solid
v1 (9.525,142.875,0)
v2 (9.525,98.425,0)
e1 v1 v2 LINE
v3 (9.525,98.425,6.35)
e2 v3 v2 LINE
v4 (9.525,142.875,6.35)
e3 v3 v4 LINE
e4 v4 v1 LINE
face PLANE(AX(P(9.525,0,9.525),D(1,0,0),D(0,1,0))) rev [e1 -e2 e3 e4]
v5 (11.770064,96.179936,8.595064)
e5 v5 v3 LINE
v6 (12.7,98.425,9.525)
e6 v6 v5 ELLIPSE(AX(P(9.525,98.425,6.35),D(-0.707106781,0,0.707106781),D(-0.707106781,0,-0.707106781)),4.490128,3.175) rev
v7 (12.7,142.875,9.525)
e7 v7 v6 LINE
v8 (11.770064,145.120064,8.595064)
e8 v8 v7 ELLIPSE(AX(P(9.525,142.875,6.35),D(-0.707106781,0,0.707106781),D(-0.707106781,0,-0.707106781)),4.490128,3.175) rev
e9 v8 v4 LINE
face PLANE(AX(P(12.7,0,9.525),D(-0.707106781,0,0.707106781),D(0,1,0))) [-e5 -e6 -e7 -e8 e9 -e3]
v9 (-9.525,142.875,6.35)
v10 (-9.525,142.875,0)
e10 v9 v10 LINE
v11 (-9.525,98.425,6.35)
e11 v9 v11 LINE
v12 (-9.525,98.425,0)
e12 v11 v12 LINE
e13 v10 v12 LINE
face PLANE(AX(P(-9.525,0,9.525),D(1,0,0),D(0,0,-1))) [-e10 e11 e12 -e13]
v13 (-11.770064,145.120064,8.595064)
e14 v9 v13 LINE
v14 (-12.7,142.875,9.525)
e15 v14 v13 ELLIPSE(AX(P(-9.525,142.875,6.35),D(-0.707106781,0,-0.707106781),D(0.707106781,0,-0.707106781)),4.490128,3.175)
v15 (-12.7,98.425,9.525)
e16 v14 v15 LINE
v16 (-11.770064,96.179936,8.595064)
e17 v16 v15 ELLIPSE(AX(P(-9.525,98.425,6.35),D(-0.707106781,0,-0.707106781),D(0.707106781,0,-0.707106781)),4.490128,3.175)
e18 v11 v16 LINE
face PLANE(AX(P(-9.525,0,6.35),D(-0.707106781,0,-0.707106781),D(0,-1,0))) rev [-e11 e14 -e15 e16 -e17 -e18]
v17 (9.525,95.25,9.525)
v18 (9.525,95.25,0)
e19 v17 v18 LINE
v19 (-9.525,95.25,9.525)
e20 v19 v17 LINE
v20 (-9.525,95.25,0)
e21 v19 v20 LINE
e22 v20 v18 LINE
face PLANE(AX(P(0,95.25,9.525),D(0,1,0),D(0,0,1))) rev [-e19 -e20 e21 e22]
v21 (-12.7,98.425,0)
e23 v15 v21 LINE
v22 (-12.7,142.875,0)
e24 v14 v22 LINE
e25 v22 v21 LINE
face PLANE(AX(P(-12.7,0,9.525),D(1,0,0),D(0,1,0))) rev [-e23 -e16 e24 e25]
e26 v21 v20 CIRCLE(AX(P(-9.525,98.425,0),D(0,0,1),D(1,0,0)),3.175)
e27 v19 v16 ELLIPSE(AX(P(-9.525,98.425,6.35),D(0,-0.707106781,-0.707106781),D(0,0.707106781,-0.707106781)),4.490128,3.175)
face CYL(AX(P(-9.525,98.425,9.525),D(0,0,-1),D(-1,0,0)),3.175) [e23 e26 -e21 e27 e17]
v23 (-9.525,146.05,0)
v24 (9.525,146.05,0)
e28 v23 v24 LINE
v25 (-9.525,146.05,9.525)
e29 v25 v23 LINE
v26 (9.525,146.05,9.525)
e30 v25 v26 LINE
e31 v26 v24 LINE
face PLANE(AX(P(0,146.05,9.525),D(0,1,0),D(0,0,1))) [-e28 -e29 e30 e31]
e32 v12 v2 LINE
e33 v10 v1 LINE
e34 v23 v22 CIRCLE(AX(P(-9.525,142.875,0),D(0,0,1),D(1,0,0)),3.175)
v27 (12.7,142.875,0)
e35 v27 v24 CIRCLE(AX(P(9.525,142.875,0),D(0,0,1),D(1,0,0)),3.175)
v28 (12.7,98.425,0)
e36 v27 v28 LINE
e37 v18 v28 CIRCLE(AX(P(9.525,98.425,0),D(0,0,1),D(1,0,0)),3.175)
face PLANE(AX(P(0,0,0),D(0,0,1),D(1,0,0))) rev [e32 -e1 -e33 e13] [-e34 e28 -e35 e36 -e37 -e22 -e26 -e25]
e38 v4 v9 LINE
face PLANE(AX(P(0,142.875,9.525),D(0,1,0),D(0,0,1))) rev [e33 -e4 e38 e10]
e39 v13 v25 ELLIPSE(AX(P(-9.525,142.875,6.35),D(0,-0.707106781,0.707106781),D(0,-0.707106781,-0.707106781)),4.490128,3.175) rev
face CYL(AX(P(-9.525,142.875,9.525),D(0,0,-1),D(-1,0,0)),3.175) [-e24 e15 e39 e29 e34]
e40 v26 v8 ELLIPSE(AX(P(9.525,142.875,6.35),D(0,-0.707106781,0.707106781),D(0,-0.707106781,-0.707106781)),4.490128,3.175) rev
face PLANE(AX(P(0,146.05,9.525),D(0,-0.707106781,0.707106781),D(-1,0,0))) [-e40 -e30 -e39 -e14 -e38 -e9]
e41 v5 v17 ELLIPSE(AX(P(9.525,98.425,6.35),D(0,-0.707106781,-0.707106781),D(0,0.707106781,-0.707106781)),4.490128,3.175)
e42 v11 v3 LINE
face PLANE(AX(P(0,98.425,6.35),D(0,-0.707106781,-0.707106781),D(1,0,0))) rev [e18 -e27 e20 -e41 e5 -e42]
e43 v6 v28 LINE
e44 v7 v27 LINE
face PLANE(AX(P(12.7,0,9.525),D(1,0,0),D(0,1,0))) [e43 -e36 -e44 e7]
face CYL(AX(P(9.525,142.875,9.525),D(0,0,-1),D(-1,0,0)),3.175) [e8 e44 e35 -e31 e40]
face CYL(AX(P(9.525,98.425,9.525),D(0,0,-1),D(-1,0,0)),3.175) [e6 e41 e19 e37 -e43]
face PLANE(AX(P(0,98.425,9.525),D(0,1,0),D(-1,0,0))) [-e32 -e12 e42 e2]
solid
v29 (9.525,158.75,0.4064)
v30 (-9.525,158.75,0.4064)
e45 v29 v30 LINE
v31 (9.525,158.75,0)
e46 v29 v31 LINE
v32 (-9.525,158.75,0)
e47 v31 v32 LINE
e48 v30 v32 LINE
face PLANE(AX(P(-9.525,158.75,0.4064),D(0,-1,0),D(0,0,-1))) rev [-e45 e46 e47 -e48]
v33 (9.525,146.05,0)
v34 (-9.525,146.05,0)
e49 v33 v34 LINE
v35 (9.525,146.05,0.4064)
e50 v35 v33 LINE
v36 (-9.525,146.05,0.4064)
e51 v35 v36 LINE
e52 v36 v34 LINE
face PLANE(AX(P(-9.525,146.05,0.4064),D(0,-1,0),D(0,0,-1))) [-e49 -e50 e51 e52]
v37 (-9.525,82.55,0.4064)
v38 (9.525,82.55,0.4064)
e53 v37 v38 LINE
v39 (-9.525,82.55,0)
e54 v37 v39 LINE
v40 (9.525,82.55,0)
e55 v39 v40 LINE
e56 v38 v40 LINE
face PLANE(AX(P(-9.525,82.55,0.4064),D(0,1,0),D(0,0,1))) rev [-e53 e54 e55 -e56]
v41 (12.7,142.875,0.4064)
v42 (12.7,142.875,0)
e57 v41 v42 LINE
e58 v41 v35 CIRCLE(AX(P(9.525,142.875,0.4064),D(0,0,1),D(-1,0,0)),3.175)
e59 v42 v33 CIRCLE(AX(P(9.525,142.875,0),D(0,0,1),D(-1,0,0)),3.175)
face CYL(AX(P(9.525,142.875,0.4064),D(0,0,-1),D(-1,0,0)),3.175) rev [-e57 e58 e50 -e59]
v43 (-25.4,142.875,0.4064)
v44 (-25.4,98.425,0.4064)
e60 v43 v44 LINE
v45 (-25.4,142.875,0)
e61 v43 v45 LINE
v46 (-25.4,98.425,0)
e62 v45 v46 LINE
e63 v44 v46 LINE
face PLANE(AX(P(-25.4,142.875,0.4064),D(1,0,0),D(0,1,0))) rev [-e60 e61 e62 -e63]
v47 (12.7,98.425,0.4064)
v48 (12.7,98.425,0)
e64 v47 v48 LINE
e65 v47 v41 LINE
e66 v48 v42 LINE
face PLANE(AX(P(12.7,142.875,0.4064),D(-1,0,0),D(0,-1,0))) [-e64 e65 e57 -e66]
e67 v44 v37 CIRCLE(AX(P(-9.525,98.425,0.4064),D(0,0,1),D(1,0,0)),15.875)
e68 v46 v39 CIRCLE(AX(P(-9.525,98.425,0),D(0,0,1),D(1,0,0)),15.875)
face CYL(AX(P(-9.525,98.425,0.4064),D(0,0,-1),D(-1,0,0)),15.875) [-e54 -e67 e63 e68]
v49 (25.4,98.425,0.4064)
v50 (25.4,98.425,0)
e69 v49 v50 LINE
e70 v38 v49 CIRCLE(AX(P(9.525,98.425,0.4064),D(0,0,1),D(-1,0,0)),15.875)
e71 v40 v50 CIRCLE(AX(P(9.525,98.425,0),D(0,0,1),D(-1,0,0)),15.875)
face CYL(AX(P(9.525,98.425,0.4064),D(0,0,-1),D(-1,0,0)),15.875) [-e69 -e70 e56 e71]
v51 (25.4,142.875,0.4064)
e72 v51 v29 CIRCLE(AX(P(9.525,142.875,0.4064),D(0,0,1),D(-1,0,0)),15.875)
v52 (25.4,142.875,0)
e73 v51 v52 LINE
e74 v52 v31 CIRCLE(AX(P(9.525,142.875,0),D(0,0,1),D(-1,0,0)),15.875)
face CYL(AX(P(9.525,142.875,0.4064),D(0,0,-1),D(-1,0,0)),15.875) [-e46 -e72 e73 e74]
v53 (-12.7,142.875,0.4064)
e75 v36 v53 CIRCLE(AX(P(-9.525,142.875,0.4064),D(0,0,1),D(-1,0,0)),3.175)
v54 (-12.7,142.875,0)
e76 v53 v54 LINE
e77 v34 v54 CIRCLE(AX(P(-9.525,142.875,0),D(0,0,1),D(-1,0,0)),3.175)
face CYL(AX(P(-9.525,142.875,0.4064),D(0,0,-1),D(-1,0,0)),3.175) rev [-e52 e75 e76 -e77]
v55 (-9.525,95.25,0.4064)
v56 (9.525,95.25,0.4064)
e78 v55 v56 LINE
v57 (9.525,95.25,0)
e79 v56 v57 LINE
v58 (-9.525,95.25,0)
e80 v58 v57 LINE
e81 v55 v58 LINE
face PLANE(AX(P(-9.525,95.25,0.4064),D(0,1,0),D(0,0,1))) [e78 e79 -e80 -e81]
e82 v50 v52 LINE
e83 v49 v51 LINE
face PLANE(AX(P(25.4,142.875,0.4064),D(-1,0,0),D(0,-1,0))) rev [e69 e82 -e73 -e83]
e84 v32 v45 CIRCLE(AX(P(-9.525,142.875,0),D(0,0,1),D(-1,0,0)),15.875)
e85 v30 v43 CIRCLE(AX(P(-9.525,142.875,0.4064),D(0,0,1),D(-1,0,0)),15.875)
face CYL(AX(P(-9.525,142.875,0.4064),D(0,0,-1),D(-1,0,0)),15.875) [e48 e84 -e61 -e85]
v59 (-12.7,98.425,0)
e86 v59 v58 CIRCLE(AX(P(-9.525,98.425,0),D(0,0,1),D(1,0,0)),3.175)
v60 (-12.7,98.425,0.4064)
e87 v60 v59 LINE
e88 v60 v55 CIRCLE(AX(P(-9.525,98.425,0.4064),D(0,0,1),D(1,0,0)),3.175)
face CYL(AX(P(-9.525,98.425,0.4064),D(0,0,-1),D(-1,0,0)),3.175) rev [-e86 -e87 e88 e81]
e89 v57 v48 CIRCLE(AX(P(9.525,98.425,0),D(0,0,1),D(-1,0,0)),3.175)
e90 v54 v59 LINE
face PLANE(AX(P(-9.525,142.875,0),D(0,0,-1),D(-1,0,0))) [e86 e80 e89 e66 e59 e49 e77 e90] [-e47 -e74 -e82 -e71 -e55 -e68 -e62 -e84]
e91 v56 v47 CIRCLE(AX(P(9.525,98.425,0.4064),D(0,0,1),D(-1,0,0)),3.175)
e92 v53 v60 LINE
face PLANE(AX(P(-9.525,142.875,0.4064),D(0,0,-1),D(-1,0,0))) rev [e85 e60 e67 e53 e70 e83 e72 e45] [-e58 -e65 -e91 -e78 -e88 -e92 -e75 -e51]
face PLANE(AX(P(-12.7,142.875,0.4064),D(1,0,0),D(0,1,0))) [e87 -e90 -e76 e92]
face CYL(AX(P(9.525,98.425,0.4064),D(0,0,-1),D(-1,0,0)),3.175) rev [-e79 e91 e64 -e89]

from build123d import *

# Parameters (mm, degrees)
BOSS_EXTRUDE1_DEPTH = 0.4064
SKETCH3_W           = 19.05
SKETCH3_H           = 44.45
BOSS_EXTRUDE5_DEPTH = 9.525


with BuildPart() as part:
    # Sketch2 → Boss-Extrude1 (new body)
    with BuildSketch(Plane.XY):
        with BuildLine():
            Line((-9.525, 158.75), (9.525, 158.75))
            ThreePointArc((9.525, 158.75), (20.750320151, 154.100320151), (25.4, 142.875))
            Line((25.4, 142.875), (25.4, 98.425))
            ThreePointArc((25.4, 98.425), (20.750320151, 87.199679849), (9.525, 82.55))
            Line((9.525, 82.55), (-9.525, 82.55))
            ThreePointArc((-9.525, 82.55), (-20.750320151, 87.199679849), (-25.4, 98.425))
            Line((-25.4, 98.425), (-25.4, 142.875))
            ThreePointArc((-25.4, 142.875), (-20.750320151, 154.100320151), (-9.525, 158.75))
        make_face()
        with BuildLine():
            Line((-9.525, 95.25), (9.525, 95.25))
            ThreePointArc((9.525, 95.25), (11.77006403, 96.17993597), (12.7, 98.425))
            Line((12.7, 98.425), (12.7, 142.875))
            ThreePointArc((12.7, 142.875), (11.77006403, 145.12006403), (9.525, 146.05))
            Line((9.525, 146.05), (-9.525, 146.05))
            ThreePointArc((-9.525, 146.05), (-11.77006403, 145.12006403), (-12.7, 142.875))
            Line((-12.7, 142.875), (-12.7, 98.425))
            ThreePointArc((-12.7, 98.425), (-11.77006403, 96.17993597), (-9.525, 95.25))
        make_face(mode=Mode.SUBTRACT)
    extrude(amount=BOSS_EXTRUDE1_DEPTH)


with BuildPart() as body_2:
    # Sketch3 → Boss-Extrude5 (new body)
    with BuildSketch(Plane.XY):
        with BuildLine():
            Line((-9.525, 95.25), (9.525, 95.25))
            ThreePointArc((9.525, 95.25), (11.77006403, 96.17993597), (12.7, 98.425))
            Line((12.7, 98.425), (12.7, 142.875))
            ThreePointArc((12.7, 142.875), (11.77006403, 145.12006403), (9.525, 146.05))
            Line((9.525, 146.05), (-9.525, 146.05))
            ThreePointArc((-9.525, 146.05), (-11.77006403, 145.12006403), (-12.7, 142.875))
            Line((-12.7, 142.875), (-12.7, 98.425))
            ThreePointArc((-12.7, 98.425), (-11.77006403, 96.17993597), (-9.525, 95.25))
        make_face()
        with Locations((0, 120.65)):
            Rectangle(SKETCH3_W, SKETCH3_H, mode=Mode.SUBTRACT)
    extrude(amount=BOSS_EXTRUDE5_DEPTH)

    # Chamfer2
    # the kernel refuses this chamfer: 3.175 mm, written as the material it takes off along each edge
    with BuildSketch(Plane(origin=(9.525, 142.875, 9.525), x_dir=(0, -0.02749587661058566, -0.9996219169112968), z_dir=(-1, 0, 0)), Plane(origin=(-9.525, 98.425, 9.525), x_dir=(0, 0.027495876610585654, -0.9996219169112968), z_dir=(1, 0, 0))) as chamfer2_piece_1:
        with BuildLine():
            Line((3.266037395, 0), (-0.179537217, -3.261098994))
            Line((-0.179537217, -3.261098994), (-0.243013208, -3.259353006))
            ThreePointArc((-0.243013208, -3.259353006), (-0.108360296, -1.630038109), (-0.063475992, 0.001745988))
            Line((-0.063475992, 0.001745988), (0.001745988, 0.063475992))
            ThreePointArc((0.001745988, 0.063475992), (1.633530085, 0.018591688), (3.267783383, 0.063475992))
            Line((3.267783383, 0.063475992), (3.266037395, 0))
        make_face()
    extrude(amount=19.05, mode=Mode.SUBTRACT)
    with BuildSketch(Plane(origin=(9.525, 98.425, 9.525), x_dir=(-0.027495876610586195, 0, -0.9996219169112966), z_dir=(0, 1, 0)), Plane(origin=(-9.525, 142.875, 9.525), x_dir=(0.027495876610586195, 0, -0.9996219169112966), z_dir=(0, -1, 0))) as chamfer2_piece_2:
        with BuildLine():
            Line((3.266037395, 0), (-0.179537217, -3.261098994))
            Line((-0.179537217, -3.261098994), (-0.243013208, -3.259353006))
            ThreePointArc((-0.243013208, -3.259353006), (-0.108360296, -1.630038109), (-0.063475992, 0.001745988))
            Line((-0.063475992, 0.001745988), (0.001745988, 0.063475992))
            ThreePointArc((0.001745988, 0.063475992), (1.633530085, 0.018591688), (3.267783383, 0.063475992))
            Line((3.267783383, 0.063475992), (3.266037395, 0))
        make_face()
    extrude(amount=44.45, mode=Mode.SUBTRACT)
    with BuildSketch(Plane(origin=(17.690093487, 142.875, 9.525), x_dir=(0, -0.02749587661058566, -0.9996219169112968), z_dir=(-1, 0, 0))) as chamfer2_piece_3a_section:
        with BuildLine():
            Line((3.266037395, 0), (-0.179537217, -3.261098994))
            Line((-0.179537217, -3.261098994), (-0.243013208, -3.259353006))
            ThreePointArc((-0.243013208, -3.259353006), (-0.108360296, -1.630038109), (-0.063475992, 0.001745988))
            Line((-0.063475992, 0.001745988), (0.001745988, 0.063475992))
            ThreePointArc((0.001745988, 0.063475992), (1.633530085, 0.018591688), (3.267783383, 0.063475992))
            Line((3.267783383, 0.063475992), (3.266037395, 0))
        make_face()
    chamfer2_piece_3a = extrude(amount=27.215093487, mode=Mode.PRIVATE)
    chamfer2_piece_3a = split(chamfer2_piece_3a, bisect_by=Plane(origin=(9.525, 143.922094765, 8.477905235), z_dir=(1, 0, 0)), keep=Keep.TOP, mode=Mode.PRIVATE)
    with BuildSketch(Plane(origin=(9.525, 98.425, 9.525), x_dir=(-0.027495876610586195, 0, -0.9996219169112966), z_dir=(0, 1, 0))) as chamfer2_piece_3b_section:
        with BuildLine():
            Line((3.266037395, 0), (-0.179537217, -3.261098994))
            Line((-0.179537217, -3.261098994), (-0.243013208, -3.259353006))
            ThreePointArc((-0.243013208, -3.259353006), (-0.108360296, -1.630038109), (-0.063475992, 0.001745988))
            Line((-0.063475992, 0.001745988), (0.001745988, 0.063475992))
            ThreePointArc((0.001745988, 0.063475992), (1.633530085, 0.018591688), (3.267783383, 0.063475992))
            Line((3.267783383, 0.063475992), (3.266037395, 0))
        make_face()
    chamfer2_piece_3b = extrude(amount=52.615093487, mode=Mode.PRIVATE)
    chamfer2_piece_3b = split(chamfer2_piece_3b, bisect_by=Plane(origin=(10.572094765, 142.875, 8.477905235), z_dir=(0, 1, 0)), keep=Keep.TOP, mode=Mode.PRIVATE)
    chamfer2_piece_3 = chamfer2_piece_3a & chamfer2_piece_3b
    add(chamfer2_piece_3, mode=Mode.SUBTRACT)
    with BuildSketch(Plane(origin=(9.525, 142.875, 9.525), x_dir=(0, -0.02749587661058566, -0.9996219169112968), z_dir=(-1, 0, 0))) as chamfer2_piece_4a_section:
        with BuildLine():
            Line((3.266037395, 0), (-0.179537217, -3.261098994))
            Line((-0.179537217, -3.261098994), (-0.243013208, -3.259353006))
            ThreePointArc((-0.243013208, -3.259353006), (-0.108360296, -1.630038109), (-0.063475992, 0.001745988))
            Line((-0.063475992, 0.001745988), (0.001745988, 0.063475992))
            ThreePointArc((0.001745988, 0.063475992), (1.633530085, 0.018591688), (3.267783383, 0.063475992))
            Line((3.267783383, 0.063475992), (3.266037395, 0))
        make_face()
    chamfer2_piece_4a = extrude(amount=27.215093487, mode=Mode.PRIVATE)
    chamfer2_piece_4a = split(chamfer2_piece_4a, bisect_by=Plane(origin=(-9.525, 143.922094765, 8.477905235), z_dir=(-1, 0, 0)), keep=Keep.TOP, mode=Mode.PRIVATE)
    with BuildSketch(Plane(origin=(-9.525, 151.040093487, 9.525), x_dir=(0.027495876610586195, 0, -0.9996219169112966), z_dir=(0, -1, 0))) as chamfer2_piece_4b_section:
        with BuildLine():
            Line((3.266037395, 0), (-0.179537217, -3.261098994))
            Line((-0.179537217, -3.261098994), (-0.243013208, -3.259353006))
            ThreePointArc((-0.243013208, -3.259353006), (-0.108360296, -1.630038109), (-0.063475992, 0.001745988))
            Line((-0.063475992, 0.001745988), (0.001745988, 0.063475992))
            ThreePointArc((0.001745988, 0.063475992), (1.633530085, 0.018591688), (3.267783383, 0.063475992))
            Line((3.267783383, 0.063475992), (3.266037395, 0))
        make_face()
    chamfer2_piece_4b = extrude(amount=52.615093487, mode=Mode.PRIVATE)
    chamfer2_piece_4b = split(chamfer2_piece_4b, bisect_by=Plane(origin=(-10.572094765, 142.875, 8.477905235), z_dir=(0, 1, 0)), keep=Keep.TOP, mode=Mode.PRIVATE)
    chamfer2_piece_4 = chamfer2_piece_4a & chamfer2_piece_4b
    add(chamfer2_piece_4, mode=Mode.SUBTRACT)
    with BuildSketch(Plane(origin=(9.525, 90.259906513, 9.525), x_dir=(-0.027495876610586195, 0, -0.9996219169112966), z_dir=(0, 1, 0))) as chamfer2_piece_5a_section:
        with BuildLine():
            Line((3.266037395, 0), (-0.179537217, -3.261098994))
            Line((-0.179537217, -3.261098994), (-0.243013208, -3.259353006))
            ThreePointArc((-0.243013208, -3.259353006), (-0.108360296, -1.630038109), (-0.063475992, 0.001745988))
            Line((-0.063475992, 0.001745988), (0.001745988, 0.063475992))
            ThreePointArc((0.001745988, 0.063475992), (1.633530085, 0.018591688), (3.267783383, 0.063475992))
            Line((3.267783383, 0.063475992), (3.266037395, 0))
        make_face()
    chamfer2_piece_5a = extrude(amount=52.615093487, mode=Mode.PRIVATE)
    chamfer2_piece_5a = split(chamfer2_piece_5a, bisect_by=Plane(origin=(10.572094765, 98.425, 8.477905235), z_dir=(0, -1, 0)), keep=Keep.TOP, mode=Mode.PRIVATE)
    with BuildSketch(Plane(origin=(-9.525, 98.425, 9.525), x_dir=(0, 0.027495876610585654, -0.9996219169112968), z_dir=(1, 0, 0))) as chamfer2_piece_5b_section:
        with BuildLine():
            Line((3.266037395, 0), (-0.179537217, -3.261098994))
            Line((-0.179537217, -3.261098994), (-0.243013208, -3.259353006))
            ThreePointArc((-0.243013208, -3.259353006), (-0.108360296, -1.630038109), (-0.063475992, 0.001745988))
            Line((-0.063475992, 0.001745988), (0.001745988, 0.063475992))
            ThreePointArc((0.001745988, 0.063475992), (1.633530085, 0.018591688), (3.267783383, 0.063475992))
            Line((3.267783383, 0.063475992), (3.266037395, 0))
        make_face()
    chamfer2_piece_5b = extrude(amount=27.215093487, mode=Mode.PRIVATE)
    chamfer2_piece_5b = split(chamfer2_piece_5b, bisect_by=Plane(origin=(9.525, 97.377905235, 8.477905235), z_dir=(1, 0, 0)), keep=Keep.TOP, mode=Mode.PRIVATE)
    chamfer2_piece_5 = chamfer2_piece_5a & chamfer2_piece_5b
    add(chamfer2_piece_5, mode=Mode.SUBTRACT)
    with BuildSketch(Plane(origin=(-17.690093487, 98.425, 9.525), x_dir=(0, 0.027495876610585654, -0.9996219169112968), z_dir=(1, 0, 0))) as chamfer2_piece_6a_section:
        with BuildLine():
            Line((3.266037395, 0), (-0.179537217, -3.261098994))
            Line((-0.179537217, -3.261098994), (-0.243013208, -3.259353006))
            ThreePointArc((-0.243013208, -3.259353006), (-0.108360296, -1.630038109), (-0.063475992, 0.001745988))
            Line((-0.063475992, 0.001745988), (0.001745988, 0.063475992))
            ThreePointArc((0.001745988, 0.063475992), (1.633530085, 0.018591688), (3.267783383, 0.063475992))
            Line((3.267783383, 0.063475992), (3.266037395, 0))
        make_face()
    chamfer2_piece_6a = extrude(amount=27.215093487, mode=Mode.PRIVATE)
    chamfer2_piece_6a = split(chamfer2_piece_6a, bisect_by=Plane(origin=(-9.525, 97.377905235, 8.477905235), z_dir=(-1, 0, 0)), keep=Keep.TOP, mode=Mode.PRIVATE)
    with BuildSketch(Plane(origin=(-9.525, 142.875, 9.525), x_dir=(0.027495876610586195, 0, -0.9996219169112966), z_dir=(0, -1, 0))) as chamfer2_piece_6b_section:
        with BuildLine():
            Line((3.266037395, 0), (-0.179537217, -3.261098994))
            Line((-0.179537217, -3.261098994), (-0.243013208, -3.259353006))
            ThreePointArc((-0.243013208, -3.259353006), (-0.108360296, -1.630038109), (-0.063475992, 0.001745988))
            Line((-0.063475992, 0.001745988), (0.001745988, 0.063475992))
            ThreePointArc((0.001745988, 0.063475992), (1.633530085, 0.018591688), (3.267783383, 0.063475992))
            Line((3.267783383, 0.063475992), (3.266037395, 0))
        make_face()
    chamfer2_piece_6b = extrude(amount=52.615093487, mode=Mode.PRIVATE)
    chamfer2_piece_6b = split(chamfer2_piece_6b, bisect_by=Plane(origin=(-10.572094765, 98.425, 8.477905235), z_dir=(0, -1, 0)), keep=Keep.TOP, mode=Mode.PRIVATE)
    chamfer2_piece_6 = chamfer2_piece_6a & chamfer2_piece_6b
    add(chamfer2_piece_6, mode=Mode.SUBTRACT)


solid = Compound([part.part, body_2.part])
